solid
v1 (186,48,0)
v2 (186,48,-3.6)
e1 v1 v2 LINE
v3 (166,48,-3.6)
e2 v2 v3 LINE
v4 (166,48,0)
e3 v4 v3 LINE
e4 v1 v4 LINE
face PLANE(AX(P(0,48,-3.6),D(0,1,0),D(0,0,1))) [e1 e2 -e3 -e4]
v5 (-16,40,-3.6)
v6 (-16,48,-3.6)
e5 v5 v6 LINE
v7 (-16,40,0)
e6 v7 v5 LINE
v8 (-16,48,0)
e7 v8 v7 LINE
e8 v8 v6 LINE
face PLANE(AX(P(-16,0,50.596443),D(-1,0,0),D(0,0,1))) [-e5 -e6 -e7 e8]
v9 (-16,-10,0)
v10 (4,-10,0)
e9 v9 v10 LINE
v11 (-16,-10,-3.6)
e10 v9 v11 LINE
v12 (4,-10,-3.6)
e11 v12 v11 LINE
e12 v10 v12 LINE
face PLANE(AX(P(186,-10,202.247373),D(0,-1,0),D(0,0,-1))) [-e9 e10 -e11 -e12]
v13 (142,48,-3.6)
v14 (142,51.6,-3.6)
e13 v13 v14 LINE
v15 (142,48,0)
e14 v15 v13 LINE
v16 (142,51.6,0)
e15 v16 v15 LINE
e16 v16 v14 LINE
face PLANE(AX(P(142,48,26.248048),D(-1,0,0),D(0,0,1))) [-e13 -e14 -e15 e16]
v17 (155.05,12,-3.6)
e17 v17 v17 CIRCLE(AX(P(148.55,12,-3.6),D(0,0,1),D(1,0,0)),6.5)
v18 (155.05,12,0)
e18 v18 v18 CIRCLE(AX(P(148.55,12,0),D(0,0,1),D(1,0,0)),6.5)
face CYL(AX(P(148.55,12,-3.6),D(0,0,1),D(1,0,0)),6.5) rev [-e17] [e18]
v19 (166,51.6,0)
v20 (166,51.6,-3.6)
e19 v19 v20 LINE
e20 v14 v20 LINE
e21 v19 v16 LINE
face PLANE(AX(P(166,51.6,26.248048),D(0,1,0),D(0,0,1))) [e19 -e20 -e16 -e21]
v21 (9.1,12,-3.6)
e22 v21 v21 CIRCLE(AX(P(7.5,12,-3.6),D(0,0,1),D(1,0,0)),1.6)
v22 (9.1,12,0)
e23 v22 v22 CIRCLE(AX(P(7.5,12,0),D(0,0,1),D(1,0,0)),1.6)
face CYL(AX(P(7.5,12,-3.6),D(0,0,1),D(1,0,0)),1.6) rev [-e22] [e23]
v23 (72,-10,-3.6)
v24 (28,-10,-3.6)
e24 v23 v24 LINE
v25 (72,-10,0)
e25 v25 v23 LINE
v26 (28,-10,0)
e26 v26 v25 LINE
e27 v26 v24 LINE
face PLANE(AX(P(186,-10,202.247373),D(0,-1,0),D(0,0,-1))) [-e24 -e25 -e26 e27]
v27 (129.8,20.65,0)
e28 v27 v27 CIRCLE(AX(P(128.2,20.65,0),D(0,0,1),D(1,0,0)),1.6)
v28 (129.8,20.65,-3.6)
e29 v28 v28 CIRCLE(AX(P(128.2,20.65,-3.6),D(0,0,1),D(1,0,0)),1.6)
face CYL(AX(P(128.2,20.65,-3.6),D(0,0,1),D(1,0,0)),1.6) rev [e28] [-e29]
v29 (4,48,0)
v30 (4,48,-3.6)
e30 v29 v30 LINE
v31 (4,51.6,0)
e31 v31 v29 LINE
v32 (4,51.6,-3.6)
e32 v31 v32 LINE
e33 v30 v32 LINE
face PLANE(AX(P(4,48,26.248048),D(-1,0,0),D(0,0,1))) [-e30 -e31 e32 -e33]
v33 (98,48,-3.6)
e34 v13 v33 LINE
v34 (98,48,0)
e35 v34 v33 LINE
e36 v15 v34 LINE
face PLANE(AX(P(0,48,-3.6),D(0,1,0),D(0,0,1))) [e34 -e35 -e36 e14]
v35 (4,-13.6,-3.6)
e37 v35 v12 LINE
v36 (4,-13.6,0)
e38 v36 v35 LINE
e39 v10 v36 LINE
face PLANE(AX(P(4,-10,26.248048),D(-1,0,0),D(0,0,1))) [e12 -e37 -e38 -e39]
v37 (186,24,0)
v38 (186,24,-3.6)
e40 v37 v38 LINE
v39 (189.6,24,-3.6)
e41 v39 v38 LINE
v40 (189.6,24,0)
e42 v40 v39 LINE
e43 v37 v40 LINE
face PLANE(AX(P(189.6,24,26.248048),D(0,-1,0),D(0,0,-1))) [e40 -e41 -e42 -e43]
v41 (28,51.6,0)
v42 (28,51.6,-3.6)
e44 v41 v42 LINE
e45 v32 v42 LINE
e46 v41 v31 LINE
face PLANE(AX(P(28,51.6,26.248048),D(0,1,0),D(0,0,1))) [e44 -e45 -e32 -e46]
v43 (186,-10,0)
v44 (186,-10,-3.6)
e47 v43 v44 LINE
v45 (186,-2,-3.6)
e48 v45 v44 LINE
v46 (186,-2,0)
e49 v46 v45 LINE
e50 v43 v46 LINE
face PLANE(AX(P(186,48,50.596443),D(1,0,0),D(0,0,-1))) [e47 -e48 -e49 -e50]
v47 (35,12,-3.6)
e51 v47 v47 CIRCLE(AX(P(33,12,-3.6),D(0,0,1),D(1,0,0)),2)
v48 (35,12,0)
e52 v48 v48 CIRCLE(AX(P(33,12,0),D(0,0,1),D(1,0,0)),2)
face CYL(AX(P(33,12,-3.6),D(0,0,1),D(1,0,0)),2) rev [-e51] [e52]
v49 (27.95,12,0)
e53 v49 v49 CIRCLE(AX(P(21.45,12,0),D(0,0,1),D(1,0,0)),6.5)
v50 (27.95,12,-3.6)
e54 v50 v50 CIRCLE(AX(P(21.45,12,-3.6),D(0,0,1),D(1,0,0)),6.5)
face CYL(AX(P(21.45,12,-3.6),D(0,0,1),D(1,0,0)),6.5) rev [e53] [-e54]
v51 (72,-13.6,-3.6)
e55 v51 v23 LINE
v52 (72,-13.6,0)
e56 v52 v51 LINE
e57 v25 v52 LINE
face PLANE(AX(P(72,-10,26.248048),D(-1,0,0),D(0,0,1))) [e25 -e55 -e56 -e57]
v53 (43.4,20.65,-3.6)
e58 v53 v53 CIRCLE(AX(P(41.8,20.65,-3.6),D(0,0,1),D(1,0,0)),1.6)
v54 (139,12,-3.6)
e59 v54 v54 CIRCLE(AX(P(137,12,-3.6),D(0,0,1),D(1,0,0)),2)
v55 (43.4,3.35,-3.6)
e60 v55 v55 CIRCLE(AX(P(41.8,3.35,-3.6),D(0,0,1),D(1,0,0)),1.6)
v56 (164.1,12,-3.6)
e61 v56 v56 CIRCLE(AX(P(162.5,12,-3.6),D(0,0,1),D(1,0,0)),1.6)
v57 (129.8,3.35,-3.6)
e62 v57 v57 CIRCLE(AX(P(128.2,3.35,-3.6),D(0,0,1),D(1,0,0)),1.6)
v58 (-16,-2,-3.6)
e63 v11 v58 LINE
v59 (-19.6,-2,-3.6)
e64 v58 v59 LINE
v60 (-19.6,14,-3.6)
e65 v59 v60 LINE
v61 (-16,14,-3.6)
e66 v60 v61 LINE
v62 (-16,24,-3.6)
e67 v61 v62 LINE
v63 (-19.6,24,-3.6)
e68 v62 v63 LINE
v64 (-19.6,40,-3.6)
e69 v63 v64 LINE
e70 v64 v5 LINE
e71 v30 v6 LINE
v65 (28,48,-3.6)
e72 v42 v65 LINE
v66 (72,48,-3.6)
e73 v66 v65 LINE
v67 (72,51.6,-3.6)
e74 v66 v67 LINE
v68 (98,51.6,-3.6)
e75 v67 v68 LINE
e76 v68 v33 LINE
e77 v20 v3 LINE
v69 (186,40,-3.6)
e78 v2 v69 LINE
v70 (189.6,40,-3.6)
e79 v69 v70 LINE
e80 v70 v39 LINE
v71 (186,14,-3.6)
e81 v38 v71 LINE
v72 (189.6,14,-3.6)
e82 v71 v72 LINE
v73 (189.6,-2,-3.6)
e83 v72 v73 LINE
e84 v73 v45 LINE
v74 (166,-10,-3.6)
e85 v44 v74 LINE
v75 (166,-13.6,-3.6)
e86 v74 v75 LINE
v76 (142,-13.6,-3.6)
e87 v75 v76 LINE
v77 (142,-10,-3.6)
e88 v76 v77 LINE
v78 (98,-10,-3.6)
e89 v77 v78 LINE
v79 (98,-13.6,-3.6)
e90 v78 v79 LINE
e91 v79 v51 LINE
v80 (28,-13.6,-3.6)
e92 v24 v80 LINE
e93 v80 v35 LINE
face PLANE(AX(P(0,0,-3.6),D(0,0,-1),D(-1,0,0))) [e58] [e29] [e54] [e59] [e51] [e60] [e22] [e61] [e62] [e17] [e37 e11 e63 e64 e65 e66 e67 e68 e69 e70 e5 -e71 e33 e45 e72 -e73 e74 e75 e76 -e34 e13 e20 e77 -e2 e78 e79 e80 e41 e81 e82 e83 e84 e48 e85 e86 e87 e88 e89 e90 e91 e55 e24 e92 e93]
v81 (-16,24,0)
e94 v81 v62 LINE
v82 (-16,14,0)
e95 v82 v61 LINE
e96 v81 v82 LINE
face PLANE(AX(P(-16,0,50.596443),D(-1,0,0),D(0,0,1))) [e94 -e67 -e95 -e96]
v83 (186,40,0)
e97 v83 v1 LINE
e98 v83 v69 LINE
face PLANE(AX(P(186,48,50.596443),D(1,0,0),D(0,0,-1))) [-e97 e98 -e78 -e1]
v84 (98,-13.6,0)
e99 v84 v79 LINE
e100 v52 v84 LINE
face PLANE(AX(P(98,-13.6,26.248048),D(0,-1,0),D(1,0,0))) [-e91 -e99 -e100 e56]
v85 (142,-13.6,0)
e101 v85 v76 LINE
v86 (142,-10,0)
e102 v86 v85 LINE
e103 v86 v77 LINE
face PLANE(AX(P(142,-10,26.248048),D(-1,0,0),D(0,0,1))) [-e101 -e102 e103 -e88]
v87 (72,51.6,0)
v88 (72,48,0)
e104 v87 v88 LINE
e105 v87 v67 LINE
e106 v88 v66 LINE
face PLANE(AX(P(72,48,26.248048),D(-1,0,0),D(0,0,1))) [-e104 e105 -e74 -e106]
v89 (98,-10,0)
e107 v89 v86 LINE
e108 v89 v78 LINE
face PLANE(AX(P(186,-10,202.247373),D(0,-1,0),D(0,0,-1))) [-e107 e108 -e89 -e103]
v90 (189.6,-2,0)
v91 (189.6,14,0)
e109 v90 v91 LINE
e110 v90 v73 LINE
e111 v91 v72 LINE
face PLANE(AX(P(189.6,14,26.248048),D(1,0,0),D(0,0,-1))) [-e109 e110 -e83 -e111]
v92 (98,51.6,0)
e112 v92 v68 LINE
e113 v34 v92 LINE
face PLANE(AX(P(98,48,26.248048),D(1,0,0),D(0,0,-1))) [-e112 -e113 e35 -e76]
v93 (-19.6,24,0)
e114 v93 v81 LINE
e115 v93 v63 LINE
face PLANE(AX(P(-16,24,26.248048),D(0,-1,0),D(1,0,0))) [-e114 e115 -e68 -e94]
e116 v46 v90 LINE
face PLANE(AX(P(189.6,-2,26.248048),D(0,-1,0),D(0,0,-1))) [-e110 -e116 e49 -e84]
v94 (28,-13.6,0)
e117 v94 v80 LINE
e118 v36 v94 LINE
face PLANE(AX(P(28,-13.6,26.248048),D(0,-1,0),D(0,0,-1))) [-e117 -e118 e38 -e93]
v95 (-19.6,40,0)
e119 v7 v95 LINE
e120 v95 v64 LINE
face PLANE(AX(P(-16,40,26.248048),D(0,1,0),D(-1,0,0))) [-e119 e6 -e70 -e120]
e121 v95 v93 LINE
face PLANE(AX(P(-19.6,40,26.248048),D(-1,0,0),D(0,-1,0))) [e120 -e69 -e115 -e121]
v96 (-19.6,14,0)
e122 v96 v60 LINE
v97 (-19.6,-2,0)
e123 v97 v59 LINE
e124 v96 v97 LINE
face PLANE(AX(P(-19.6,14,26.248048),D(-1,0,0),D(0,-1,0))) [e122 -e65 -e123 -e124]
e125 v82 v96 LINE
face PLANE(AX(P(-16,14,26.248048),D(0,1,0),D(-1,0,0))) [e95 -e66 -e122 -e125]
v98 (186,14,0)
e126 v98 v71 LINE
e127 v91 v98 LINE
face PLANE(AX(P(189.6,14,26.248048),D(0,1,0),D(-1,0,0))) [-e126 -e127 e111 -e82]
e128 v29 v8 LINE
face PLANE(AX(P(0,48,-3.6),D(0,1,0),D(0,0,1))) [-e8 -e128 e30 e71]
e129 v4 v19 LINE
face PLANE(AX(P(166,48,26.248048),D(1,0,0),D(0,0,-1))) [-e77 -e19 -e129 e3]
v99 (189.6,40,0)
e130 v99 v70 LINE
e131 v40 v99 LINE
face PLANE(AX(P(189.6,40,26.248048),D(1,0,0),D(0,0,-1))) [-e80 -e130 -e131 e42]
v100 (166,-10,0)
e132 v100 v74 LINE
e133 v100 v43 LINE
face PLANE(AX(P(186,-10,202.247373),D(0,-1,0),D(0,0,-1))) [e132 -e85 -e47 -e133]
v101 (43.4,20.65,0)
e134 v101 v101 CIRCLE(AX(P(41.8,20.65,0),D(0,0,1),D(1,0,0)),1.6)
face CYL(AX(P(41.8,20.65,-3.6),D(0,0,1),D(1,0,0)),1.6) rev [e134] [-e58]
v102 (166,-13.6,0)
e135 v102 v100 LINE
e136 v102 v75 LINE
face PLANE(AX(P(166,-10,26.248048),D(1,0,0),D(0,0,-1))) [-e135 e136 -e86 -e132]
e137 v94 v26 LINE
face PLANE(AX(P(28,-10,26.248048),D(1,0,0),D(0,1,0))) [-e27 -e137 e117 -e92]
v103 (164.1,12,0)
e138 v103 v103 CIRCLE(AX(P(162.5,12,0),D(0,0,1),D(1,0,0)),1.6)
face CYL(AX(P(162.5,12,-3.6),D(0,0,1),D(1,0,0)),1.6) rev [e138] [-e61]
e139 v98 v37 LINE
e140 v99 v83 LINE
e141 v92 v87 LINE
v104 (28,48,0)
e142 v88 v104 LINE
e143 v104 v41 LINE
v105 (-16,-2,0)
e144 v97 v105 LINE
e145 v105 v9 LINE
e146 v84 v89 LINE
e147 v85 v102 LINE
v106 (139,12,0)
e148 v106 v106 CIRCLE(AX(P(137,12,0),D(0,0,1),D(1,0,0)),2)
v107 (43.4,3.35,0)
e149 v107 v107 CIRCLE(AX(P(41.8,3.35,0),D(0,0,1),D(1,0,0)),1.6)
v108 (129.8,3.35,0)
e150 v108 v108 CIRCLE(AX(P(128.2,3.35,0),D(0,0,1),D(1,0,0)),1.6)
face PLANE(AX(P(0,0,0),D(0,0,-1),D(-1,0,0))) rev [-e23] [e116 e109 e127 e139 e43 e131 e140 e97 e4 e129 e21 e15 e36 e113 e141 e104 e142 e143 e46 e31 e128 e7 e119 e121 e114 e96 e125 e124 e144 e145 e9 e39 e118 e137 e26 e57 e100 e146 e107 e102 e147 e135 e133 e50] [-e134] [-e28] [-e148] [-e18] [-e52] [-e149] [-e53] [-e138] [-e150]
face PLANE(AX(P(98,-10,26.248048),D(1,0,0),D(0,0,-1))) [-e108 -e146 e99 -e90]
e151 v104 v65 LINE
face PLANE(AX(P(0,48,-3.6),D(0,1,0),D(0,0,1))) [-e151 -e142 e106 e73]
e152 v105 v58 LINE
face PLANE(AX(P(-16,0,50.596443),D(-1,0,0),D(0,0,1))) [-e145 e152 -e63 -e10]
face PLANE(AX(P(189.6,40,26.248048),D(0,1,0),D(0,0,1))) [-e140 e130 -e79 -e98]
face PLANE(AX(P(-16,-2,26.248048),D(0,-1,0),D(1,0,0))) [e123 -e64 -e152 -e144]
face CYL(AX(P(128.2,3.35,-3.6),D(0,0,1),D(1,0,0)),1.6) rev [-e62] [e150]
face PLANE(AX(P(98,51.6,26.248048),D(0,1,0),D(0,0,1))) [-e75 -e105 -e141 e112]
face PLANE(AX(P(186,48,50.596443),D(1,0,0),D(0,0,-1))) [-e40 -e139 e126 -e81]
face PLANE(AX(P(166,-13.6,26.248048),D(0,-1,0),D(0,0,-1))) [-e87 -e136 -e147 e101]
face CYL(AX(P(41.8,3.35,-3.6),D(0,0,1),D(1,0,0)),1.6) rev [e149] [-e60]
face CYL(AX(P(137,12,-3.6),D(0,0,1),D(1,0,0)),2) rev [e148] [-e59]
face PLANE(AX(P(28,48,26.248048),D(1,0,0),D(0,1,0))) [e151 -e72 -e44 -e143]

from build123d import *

# Parameters (mm, degrees)
SKETCH_1_W             = 170
SKETCH_1_H             = 48
SKETCH_1_R             = 2
SKETCH_1_R_2           = 6.5
SKETCH_1_R_3           = 1.6
SM_BASE_FLANGE_1_DEPTH = 3.6
SKETCH_7_W             = 16
SKETCH_7_H             = 48
EXTRUDE_1_DEPTH        = 3.6
SKETCH_8_W             = 202
SKETCH_8_H             = 10
EXTRUDE_2_DEPTH        = 3.6
SKETCH_9_W             = 3.6
SKETCH_9_H             = 16
SKETCH_9_W_2           = 24
SKETCH_9_H_2           = 3.6
SKETCH_9_W_3           = 26
EXTRUDE_3_DEPTH        = 3.6


# Sheet-metal steps are written as plain solids
with BuildPart() as part:
    # Sketch 1 → Базовая кромка1 (new body)
    with BuildSketch(Plane.XY):
        with Locations((85, 24)):
            Rectangle(SKETCH_1_W, SKETCH_1_H)
        with Locations((137, 12)):
            Circle(SKETCH_1_R, mode=Mode.SUBTRACT)
        with Locations((33, 12)):
            Circle(SKETCH_1_R, mode=Mode.SUBTRACT)
        with Locations((148.55, 12)):
            Circle(SKETCH_1_R_2, mode=Mode.SUBTRACT)
        with Locations((21.45, 12)):
            Circle(SKETCH_1_R_2, mode=Mode.SUBTRACT)
        with Locations((128.2, 20.65)):
            Circle(SKETCH_1_R_3, mode=Mode.SUBTRACT)
        with Locations((128.2, 3.35)):
            Circle(SKETCH_1_R_3, mode=Mode.SUBTRACT)
        with Locations((41.8, 20.65)):
            Circle(SKETCH_1_R_3, mode=Mode.SUBTRACT)
        with Locations((41.8, 3.35)):
            Circle(SKETCH_1_R_3, mode=Mode.SUBTRACT)
        with Locations((162.5, 12)):
            Circle(SKETCH_1_R_3, mode=Mode.SUBTRACT)
        with Locations((7.5, 12)):
            Circle(SKETCH_1_R_3, mode=Mode.SUBTRACT)
    extrude(amount=-SM_BASE_FLANGE_1_DEPTH)

    # Эскиз7 → Бобышка-Вытянуть1 (add)
    with BuildSketch(Plane(origin=(0, 0, -3.6), x_dir=(-1, 0, 0), z_dir=(0, 0, -1))):
        with Locations((-178, 24)):
            Rectangle(SKETCH_7_W, SKETCH_7_H)
        with Locations((8, 24)):
            Rectangle(SKETCH_7_W, SKETCH_7_H)
    extrude(amount=-EXTRUDE_1_DEPTH)

    # Эскиз8 → Бобышка-Вытянуть2 (add)
    with BuildSketch(Plane(origin=(0, 0, -3.6), x_dir=(-1, 0, 0), z_dir=(0, 0, -1))):
        with Locations((-85, -5)):
            Rectangle(SKETCH_8_W, SKETCH_8_H)
    extrude(amount=-EXTRUDE_2_DEPTH)

    # Эскиз9 → Бобышка-Вытянуть3 (add)
    with BuildSketch(Plane(origin=(0, 0, -3.6), x_dir=(-1, 0, 0), z_dir=(0, 0, -1))):
        with Locations((-187.8, 32)):
            Rectangle(SKETCH_9_W, SKETCH_9_H)
        with Locations((-187.8, 6)):
            Rectangle(SKETCH_9_W, SKETCH_9_H)
        with Locations((-154, 49.8)):
            Rectangle(SKETCH_9_W_2, SKETCH_9_H_2)
        with Locations((-85, 49.8)):
            Rectangle(SKETCH_9_W_3, SKETCH_9_H_2)
        with Locations((-16, 49.8)):
            Rectangle(SKETCH_9_W_2, SKETCH_9_H_2)
        with Locations((17.8, 32)):
            Rectangle(SKETCH_9_W, SKETCH_9_H)
        with Locations((17.8, 6)):
            Rectangle(SKETCH_9_W, SKETCH_9_H)
        with Locations((-16, -11.8)):
            Rectangle(SKETCH_9_W_2, SKETCH_9_H_2)
        with Locations((-85, -11.8)):
            Rectangle(SKETCH_9_W_3, SKETCH_9_H_2)
        with Locations((-154, -11.8)):
            Rectangle(SKETCH_9_W_2, SKETCH_9_H_2)
    extrude(amount=-EXTRUDE_3_DEPTH)


solid = part.part
